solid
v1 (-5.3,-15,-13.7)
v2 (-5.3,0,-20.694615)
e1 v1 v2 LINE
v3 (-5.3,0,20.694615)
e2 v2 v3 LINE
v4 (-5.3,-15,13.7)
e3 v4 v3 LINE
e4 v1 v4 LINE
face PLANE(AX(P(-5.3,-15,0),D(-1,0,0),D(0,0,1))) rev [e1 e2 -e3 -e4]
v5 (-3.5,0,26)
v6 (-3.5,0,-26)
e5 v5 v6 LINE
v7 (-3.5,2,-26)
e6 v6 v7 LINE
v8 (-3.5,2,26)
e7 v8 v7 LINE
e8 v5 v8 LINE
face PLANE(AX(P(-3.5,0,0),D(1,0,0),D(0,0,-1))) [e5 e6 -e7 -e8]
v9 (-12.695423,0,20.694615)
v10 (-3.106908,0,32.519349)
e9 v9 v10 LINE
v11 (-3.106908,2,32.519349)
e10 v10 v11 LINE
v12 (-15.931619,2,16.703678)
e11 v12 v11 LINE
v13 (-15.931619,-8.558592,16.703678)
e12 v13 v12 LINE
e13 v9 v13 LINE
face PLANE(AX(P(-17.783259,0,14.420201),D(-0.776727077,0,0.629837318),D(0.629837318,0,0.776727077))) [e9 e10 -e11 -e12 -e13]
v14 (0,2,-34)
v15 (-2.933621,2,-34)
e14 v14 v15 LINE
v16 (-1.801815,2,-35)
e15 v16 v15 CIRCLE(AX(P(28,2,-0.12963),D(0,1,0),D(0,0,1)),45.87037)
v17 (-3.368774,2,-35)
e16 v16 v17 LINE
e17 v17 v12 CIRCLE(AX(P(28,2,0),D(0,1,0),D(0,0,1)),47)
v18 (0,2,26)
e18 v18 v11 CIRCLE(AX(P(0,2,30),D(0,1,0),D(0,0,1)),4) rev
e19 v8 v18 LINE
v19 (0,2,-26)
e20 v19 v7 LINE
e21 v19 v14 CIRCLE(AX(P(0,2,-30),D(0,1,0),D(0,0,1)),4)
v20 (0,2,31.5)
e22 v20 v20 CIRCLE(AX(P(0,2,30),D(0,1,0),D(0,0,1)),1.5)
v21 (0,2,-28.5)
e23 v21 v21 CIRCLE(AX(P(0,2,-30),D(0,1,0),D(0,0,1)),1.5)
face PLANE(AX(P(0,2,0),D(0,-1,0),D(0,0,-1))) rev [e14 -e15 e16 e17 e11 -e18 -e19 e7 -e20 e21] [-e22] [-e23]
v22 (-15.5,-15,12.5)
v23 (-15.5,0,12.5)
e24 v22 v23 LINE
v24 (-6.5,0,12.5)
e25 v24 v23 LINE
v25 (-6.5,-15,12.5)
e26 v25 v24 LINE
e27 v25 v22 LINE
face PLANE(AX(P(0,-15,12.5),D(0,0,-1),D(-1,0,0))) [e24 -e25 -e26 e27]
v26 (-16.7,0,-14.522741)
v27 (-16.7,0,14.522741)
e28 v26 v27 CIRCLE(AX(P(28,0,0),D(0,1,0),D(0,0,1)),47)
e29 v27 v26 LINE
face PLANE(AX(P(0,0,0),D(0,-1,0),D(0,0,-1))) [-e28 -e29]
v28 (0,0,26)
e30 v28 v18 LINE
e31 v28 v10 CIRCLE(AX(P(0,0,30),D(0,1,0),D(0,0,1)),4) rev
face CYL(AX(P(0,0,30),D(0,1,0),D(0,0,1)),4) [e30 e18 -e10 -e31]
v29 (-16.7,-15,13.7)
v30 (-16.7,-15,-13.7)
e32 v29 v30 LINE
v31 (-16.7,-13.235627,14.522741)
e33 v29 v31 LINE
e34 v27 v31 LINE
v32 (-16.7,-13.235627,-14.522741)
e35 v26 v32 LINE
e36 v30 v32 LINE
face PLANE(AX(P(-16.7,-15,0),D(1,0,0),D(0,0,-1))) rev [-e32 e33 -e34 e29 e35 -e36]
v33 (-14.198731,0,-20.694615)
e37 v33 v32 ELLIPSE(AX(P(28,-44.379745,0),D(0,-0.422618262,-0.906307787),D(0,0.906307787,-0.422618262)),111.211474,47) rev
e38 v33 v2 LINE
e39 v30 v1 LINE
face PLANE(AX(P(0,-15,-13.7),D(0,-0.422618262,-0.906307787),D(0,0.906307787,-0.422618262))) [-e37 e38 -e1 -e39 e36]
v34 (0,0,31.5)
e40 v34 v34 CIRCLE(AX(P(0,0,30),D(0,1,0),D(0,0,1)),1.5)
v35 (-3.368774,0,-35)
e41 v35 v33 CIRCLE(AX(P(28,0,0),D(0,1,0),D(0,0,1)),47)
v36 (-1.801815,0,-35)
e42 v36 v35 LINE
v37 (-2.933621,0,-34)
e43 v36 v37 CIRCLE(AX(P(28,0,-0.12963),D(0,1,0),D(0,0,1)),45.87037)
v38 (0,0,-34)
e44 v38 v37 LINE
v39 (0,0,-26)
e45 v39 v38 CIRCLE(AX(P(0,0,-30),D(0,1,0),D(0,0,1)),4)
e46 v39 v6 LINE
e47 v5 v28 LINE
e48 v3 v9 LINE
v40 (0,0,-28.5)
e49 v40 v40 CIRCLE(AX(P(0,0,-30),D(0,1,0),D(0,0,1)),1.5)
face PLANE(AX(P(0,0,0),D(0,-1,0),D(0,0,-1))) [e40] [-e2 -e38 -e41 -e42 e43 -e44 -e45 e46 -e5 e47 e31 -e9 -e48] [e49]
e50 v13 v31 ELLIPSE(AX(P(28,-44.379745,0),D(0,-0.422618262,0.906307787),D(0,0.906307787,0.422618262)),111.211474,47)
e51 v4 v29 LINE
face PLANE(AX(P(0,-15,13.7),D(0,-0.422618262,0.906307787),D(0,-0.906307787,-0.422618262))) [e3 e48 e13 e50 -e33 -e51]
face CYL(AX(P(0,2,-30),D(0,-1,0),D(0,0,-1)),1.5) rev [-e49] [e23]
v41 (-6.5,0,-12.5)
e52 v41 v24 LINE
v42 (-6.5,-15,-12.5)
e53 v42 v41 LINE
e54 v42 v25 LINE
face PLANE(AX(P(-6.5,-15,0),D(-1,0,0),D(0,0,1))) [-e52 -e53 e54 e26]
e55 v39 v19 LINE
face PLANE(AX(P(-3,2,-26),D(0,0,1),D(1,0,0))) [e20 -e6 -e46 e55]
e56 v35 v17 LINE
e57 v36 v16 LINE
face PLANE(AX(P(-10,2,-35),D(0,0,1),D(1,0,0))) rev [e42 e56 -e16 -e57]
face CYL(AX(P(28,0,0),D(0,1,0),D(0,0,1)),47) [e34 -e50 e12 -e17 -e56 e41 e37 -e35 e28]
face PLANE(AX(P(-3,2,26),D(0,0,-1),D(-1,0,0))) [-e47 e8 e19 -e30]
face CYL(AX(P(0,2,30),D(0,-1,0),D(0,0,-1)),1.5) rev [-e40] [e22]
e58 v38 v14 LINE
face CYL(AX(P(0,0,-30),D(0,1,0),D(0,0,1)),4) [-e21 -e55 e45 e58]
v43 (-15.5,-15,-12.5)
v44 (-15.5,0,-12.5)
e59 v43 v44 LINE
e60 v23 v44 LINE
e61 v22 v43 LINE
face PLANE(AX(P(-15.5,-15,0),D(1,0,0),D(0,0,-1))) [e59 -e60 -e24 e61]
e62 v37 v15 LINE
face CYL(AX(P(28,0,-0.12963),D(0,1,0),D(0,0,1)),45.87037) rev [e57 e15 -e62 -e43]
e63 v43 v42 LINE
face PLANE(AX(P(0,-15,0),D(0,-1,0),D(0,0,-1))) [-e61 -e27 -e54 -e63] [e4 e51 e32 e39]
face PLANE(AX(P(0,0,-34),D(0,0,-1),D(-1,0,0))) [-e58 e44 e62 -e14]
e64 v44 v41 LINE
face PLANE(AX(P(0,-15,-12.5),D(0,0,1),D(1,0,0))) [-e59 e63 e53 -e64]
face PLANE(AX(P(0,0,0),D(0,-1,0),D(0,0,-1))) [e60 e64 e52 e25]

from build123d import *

# Parameters (mm, degrees)
SKETCH_1_W          = 20
SKETCH_1_H          = 70
SKETCH_1_R          = 1.5
SKETCH_1_W_2        = 6
SKETCH_1_H_2        = 52
EXTRUDE_1_DEPTH     = 2
SKETCH_2_W          = 0.5
SKETCH_2_H          = 26
CUT_EXTRUDE_1_DEPTH = 37.455452267
EXTRUDE_3_DEPTH     = 2
SKETCH_4_W          = 11.4
SKETCH_4_H          = 27.4
SKETCH_4_W_2        = 9
SKETCH_4_H_2        = 25
EXTRUDE_4_DEPTH     = 15
DRAFT_START         = -16.7
DRAFT_1_DEPTH       = 11.4
DRAFT_START_2       = -13.235626686
DRAFT_1_2_DEPTH     = 13.235626686


with BuildPart() as part:
    # Эскиз1 → Бобышка-Вытянуть1 (new body)
    with BuildSketch(Plane(origin=(0, 0, 0), x_dir=(1, 0, 0), z_dir=(0, 1, 0))):
        Rectangle(SKETCH_1_W, SKETCH_1_H)
        with Locations(Location((0, 30, 0), (0, 0, 270))):
            Circle(SKETCH_1_R, mode=Mode.SUBTRACT)
        with Locations(Location((0, -30, 0), (0, 0, 270))):
            Circle(SKETCH_1_R, mode=Mode.SUBTRACT)
        Rectangle(SKETCH_1_W_2, SKETCH_1_H_2, mode=Mode.SUBTRACT)
    extrude(amount=EXTRUDE_1_DEPTH)

    # Эскиз2 → Вырез-Вытянуть1 (cut, through all)
    with BuildSketch(Plane(origin=(0, 2, 0), x_dir=(1, 0, 0), z_dir=(0, 1, 0))):
        with Locations((-3.25, -13)):
            Rectangle(SKETCH_2_W, SKETCH_2_H)
        with Locations((-3.25, 13)):
            Rectangle(SKETCH_2_W, SKETCH_2_H)
        with BuildLine():
            ThreePointArc((4, 30), (2.828427125, 27.171572875), (0, 26))
            Line((0, 26), (3, 26))
            Line((3, 26), (3, 0))
            Line((3, 0), (10, 0))
            Line((10, 0), (10, 35))
            Line((10, 35), (-1.801814511, 35))
            ThreePointArc((-1.801814511, 35), (-2.371833534, 34.50465844), (-2.933620688, 34))
            Line((-2.933620688, 34), (0, 34))
            ThreePointArc((0, 34), (2.828427125, 32.828427125), (4, 30))
        make_face()
        with BuildLine():
            ThreePointArc((-10, 27.658633372), (-7.367393186, 30.953957731), (-4.449961479, 34))
            ThreePointArc((-4.449961479, 34), (-3.913284985, 34.504235123), (-3.368774283, 35))
            Line((-3.368774283, 35), (-10, 35))
            Line((-10, 35), (-10, 27.658633372))
        make_face()
        with BuildLine():
            Line((10, 0), (3, 0))
            Line((3, 0), (3, -26))
            Line((3, -26), (0, -26))
            ThreePointArc((0, -26), (2.828427125, -27.171572875), (4, -30))
            ThreePointArc((4, -30), (1.336481718, -33.770121565), (-3.106908308, -32.519349274))
            Line((-3.106908308, -32.519349274), (-4.5, -30.80136273))
            Line((-4.5, -30.80136273), (-4.5, -32.5))
            ThreePointArc((-4.5, -32.5), (-3.175976694, -33.777056798), (-1.801814511, -35))
            Line((-1.801814511, -35), (10, -35))
            Line((10, -35), (10, 0))
        make_face()
        with BuildLine():
            Line((-4.5, -32.5), (-4.5, -30.80136273))
            Line((-4.5, -30.80136273), (-10, -24.018660595))
            Line((-10, -24.018660595), (-10, -35))
            Line((-10, -35), (-1.801814511, -35))
            ThreePointArc((-1.801814511, -35), (-3.175976694, -33.777056798), (-4.5, -32.5))
        make_face()
    extrude(amount=-CUT_EXTRUDE_1_DEPTH, mode=Mode.SUBTRACT)

    # Эскиз3 → Бобышка-Вытянуть3 (add)
    with BuildSketch(Plane(origin=(0, 2, 0), x_dir=(1, 0, 0), z_dir=(0, 1, 0))):
        with BuildLine():
            Line((-15.931618932, -16.703677979), (-10, -24.018660595))
            Line((-10, -24.018660595), (-10, 27.658633372))
            ThreePointArc((-10, 27.658633372), (-18.585418451, 6.228867289), (-15.931618932, -16.703677979))
        make_face()
    extrude(amount=-EXTRUDE_3_DEPTH)

    # Эскиз4 → Бобышка-Вытянуть4 (add)
    with BuildSketch(Plane.XZ):
        with Locations((-11, 0)):
            Rectangle(SKETCH_4_W, SKETCH_4_H)
        with Locations((-11, 0)):
            Rectangle(SKETCH_4_W_2, SKETCH_4_H_2, mode=Mode.SUBTRACT)
    extrude(amount=EXTRUDE_4_DEPTH)

    # Уклон1: read off the stored shape, not the designer's step
    # Уклон1 outline → Уклон1 (add)
    with BuildSketch(Plane.YZ.offset(DRAFT_START)):
        Polygon((0, 13.7), (0, 20.694614872), (-15, 13.7), align=None)
        Polygon((0, -20.694614872), (0, -13.7), (-15, -13.7), align=None)
    extrude(amount=DRAFT_1_DEPTH)

    # Draft 1 2 outline → Draft 1 2 (cut)
    with BuildSketch(Plane(origin=(0, 0, 0), x_dir=(1, 0, 0), z_dir=(0, 1, 0)).offset(DRAFT_START_2)):
        with BuildLine():
            Line((-11.63690415, -22), (-15.931618932, -16.703677979))
            ThreePointArc((-15.931618932, -16.703677979), (-16.329223887, -15.617935511), (-16.7, -14.522740789))
            Line((-16.7, -14.522740789), (-16.7, -22))
            Line((-16.7, -22), (-11.63690415, -22))
        make_face()
        with BuildLine():
            Line((-16.7, 22), (-16.7, 14.522740788))
            ThreePointArc((-16.7, 14.522740788), (-15.2783441, 18.329891761), (-13.533119315, 22))
            Line((-13.533119315, 22), (-16.7, 22))
        make_face()
    extrude(amount=DRAFT_1_2_DEPTH, mode=Mode.SUBTRACT)


solid = part.part
